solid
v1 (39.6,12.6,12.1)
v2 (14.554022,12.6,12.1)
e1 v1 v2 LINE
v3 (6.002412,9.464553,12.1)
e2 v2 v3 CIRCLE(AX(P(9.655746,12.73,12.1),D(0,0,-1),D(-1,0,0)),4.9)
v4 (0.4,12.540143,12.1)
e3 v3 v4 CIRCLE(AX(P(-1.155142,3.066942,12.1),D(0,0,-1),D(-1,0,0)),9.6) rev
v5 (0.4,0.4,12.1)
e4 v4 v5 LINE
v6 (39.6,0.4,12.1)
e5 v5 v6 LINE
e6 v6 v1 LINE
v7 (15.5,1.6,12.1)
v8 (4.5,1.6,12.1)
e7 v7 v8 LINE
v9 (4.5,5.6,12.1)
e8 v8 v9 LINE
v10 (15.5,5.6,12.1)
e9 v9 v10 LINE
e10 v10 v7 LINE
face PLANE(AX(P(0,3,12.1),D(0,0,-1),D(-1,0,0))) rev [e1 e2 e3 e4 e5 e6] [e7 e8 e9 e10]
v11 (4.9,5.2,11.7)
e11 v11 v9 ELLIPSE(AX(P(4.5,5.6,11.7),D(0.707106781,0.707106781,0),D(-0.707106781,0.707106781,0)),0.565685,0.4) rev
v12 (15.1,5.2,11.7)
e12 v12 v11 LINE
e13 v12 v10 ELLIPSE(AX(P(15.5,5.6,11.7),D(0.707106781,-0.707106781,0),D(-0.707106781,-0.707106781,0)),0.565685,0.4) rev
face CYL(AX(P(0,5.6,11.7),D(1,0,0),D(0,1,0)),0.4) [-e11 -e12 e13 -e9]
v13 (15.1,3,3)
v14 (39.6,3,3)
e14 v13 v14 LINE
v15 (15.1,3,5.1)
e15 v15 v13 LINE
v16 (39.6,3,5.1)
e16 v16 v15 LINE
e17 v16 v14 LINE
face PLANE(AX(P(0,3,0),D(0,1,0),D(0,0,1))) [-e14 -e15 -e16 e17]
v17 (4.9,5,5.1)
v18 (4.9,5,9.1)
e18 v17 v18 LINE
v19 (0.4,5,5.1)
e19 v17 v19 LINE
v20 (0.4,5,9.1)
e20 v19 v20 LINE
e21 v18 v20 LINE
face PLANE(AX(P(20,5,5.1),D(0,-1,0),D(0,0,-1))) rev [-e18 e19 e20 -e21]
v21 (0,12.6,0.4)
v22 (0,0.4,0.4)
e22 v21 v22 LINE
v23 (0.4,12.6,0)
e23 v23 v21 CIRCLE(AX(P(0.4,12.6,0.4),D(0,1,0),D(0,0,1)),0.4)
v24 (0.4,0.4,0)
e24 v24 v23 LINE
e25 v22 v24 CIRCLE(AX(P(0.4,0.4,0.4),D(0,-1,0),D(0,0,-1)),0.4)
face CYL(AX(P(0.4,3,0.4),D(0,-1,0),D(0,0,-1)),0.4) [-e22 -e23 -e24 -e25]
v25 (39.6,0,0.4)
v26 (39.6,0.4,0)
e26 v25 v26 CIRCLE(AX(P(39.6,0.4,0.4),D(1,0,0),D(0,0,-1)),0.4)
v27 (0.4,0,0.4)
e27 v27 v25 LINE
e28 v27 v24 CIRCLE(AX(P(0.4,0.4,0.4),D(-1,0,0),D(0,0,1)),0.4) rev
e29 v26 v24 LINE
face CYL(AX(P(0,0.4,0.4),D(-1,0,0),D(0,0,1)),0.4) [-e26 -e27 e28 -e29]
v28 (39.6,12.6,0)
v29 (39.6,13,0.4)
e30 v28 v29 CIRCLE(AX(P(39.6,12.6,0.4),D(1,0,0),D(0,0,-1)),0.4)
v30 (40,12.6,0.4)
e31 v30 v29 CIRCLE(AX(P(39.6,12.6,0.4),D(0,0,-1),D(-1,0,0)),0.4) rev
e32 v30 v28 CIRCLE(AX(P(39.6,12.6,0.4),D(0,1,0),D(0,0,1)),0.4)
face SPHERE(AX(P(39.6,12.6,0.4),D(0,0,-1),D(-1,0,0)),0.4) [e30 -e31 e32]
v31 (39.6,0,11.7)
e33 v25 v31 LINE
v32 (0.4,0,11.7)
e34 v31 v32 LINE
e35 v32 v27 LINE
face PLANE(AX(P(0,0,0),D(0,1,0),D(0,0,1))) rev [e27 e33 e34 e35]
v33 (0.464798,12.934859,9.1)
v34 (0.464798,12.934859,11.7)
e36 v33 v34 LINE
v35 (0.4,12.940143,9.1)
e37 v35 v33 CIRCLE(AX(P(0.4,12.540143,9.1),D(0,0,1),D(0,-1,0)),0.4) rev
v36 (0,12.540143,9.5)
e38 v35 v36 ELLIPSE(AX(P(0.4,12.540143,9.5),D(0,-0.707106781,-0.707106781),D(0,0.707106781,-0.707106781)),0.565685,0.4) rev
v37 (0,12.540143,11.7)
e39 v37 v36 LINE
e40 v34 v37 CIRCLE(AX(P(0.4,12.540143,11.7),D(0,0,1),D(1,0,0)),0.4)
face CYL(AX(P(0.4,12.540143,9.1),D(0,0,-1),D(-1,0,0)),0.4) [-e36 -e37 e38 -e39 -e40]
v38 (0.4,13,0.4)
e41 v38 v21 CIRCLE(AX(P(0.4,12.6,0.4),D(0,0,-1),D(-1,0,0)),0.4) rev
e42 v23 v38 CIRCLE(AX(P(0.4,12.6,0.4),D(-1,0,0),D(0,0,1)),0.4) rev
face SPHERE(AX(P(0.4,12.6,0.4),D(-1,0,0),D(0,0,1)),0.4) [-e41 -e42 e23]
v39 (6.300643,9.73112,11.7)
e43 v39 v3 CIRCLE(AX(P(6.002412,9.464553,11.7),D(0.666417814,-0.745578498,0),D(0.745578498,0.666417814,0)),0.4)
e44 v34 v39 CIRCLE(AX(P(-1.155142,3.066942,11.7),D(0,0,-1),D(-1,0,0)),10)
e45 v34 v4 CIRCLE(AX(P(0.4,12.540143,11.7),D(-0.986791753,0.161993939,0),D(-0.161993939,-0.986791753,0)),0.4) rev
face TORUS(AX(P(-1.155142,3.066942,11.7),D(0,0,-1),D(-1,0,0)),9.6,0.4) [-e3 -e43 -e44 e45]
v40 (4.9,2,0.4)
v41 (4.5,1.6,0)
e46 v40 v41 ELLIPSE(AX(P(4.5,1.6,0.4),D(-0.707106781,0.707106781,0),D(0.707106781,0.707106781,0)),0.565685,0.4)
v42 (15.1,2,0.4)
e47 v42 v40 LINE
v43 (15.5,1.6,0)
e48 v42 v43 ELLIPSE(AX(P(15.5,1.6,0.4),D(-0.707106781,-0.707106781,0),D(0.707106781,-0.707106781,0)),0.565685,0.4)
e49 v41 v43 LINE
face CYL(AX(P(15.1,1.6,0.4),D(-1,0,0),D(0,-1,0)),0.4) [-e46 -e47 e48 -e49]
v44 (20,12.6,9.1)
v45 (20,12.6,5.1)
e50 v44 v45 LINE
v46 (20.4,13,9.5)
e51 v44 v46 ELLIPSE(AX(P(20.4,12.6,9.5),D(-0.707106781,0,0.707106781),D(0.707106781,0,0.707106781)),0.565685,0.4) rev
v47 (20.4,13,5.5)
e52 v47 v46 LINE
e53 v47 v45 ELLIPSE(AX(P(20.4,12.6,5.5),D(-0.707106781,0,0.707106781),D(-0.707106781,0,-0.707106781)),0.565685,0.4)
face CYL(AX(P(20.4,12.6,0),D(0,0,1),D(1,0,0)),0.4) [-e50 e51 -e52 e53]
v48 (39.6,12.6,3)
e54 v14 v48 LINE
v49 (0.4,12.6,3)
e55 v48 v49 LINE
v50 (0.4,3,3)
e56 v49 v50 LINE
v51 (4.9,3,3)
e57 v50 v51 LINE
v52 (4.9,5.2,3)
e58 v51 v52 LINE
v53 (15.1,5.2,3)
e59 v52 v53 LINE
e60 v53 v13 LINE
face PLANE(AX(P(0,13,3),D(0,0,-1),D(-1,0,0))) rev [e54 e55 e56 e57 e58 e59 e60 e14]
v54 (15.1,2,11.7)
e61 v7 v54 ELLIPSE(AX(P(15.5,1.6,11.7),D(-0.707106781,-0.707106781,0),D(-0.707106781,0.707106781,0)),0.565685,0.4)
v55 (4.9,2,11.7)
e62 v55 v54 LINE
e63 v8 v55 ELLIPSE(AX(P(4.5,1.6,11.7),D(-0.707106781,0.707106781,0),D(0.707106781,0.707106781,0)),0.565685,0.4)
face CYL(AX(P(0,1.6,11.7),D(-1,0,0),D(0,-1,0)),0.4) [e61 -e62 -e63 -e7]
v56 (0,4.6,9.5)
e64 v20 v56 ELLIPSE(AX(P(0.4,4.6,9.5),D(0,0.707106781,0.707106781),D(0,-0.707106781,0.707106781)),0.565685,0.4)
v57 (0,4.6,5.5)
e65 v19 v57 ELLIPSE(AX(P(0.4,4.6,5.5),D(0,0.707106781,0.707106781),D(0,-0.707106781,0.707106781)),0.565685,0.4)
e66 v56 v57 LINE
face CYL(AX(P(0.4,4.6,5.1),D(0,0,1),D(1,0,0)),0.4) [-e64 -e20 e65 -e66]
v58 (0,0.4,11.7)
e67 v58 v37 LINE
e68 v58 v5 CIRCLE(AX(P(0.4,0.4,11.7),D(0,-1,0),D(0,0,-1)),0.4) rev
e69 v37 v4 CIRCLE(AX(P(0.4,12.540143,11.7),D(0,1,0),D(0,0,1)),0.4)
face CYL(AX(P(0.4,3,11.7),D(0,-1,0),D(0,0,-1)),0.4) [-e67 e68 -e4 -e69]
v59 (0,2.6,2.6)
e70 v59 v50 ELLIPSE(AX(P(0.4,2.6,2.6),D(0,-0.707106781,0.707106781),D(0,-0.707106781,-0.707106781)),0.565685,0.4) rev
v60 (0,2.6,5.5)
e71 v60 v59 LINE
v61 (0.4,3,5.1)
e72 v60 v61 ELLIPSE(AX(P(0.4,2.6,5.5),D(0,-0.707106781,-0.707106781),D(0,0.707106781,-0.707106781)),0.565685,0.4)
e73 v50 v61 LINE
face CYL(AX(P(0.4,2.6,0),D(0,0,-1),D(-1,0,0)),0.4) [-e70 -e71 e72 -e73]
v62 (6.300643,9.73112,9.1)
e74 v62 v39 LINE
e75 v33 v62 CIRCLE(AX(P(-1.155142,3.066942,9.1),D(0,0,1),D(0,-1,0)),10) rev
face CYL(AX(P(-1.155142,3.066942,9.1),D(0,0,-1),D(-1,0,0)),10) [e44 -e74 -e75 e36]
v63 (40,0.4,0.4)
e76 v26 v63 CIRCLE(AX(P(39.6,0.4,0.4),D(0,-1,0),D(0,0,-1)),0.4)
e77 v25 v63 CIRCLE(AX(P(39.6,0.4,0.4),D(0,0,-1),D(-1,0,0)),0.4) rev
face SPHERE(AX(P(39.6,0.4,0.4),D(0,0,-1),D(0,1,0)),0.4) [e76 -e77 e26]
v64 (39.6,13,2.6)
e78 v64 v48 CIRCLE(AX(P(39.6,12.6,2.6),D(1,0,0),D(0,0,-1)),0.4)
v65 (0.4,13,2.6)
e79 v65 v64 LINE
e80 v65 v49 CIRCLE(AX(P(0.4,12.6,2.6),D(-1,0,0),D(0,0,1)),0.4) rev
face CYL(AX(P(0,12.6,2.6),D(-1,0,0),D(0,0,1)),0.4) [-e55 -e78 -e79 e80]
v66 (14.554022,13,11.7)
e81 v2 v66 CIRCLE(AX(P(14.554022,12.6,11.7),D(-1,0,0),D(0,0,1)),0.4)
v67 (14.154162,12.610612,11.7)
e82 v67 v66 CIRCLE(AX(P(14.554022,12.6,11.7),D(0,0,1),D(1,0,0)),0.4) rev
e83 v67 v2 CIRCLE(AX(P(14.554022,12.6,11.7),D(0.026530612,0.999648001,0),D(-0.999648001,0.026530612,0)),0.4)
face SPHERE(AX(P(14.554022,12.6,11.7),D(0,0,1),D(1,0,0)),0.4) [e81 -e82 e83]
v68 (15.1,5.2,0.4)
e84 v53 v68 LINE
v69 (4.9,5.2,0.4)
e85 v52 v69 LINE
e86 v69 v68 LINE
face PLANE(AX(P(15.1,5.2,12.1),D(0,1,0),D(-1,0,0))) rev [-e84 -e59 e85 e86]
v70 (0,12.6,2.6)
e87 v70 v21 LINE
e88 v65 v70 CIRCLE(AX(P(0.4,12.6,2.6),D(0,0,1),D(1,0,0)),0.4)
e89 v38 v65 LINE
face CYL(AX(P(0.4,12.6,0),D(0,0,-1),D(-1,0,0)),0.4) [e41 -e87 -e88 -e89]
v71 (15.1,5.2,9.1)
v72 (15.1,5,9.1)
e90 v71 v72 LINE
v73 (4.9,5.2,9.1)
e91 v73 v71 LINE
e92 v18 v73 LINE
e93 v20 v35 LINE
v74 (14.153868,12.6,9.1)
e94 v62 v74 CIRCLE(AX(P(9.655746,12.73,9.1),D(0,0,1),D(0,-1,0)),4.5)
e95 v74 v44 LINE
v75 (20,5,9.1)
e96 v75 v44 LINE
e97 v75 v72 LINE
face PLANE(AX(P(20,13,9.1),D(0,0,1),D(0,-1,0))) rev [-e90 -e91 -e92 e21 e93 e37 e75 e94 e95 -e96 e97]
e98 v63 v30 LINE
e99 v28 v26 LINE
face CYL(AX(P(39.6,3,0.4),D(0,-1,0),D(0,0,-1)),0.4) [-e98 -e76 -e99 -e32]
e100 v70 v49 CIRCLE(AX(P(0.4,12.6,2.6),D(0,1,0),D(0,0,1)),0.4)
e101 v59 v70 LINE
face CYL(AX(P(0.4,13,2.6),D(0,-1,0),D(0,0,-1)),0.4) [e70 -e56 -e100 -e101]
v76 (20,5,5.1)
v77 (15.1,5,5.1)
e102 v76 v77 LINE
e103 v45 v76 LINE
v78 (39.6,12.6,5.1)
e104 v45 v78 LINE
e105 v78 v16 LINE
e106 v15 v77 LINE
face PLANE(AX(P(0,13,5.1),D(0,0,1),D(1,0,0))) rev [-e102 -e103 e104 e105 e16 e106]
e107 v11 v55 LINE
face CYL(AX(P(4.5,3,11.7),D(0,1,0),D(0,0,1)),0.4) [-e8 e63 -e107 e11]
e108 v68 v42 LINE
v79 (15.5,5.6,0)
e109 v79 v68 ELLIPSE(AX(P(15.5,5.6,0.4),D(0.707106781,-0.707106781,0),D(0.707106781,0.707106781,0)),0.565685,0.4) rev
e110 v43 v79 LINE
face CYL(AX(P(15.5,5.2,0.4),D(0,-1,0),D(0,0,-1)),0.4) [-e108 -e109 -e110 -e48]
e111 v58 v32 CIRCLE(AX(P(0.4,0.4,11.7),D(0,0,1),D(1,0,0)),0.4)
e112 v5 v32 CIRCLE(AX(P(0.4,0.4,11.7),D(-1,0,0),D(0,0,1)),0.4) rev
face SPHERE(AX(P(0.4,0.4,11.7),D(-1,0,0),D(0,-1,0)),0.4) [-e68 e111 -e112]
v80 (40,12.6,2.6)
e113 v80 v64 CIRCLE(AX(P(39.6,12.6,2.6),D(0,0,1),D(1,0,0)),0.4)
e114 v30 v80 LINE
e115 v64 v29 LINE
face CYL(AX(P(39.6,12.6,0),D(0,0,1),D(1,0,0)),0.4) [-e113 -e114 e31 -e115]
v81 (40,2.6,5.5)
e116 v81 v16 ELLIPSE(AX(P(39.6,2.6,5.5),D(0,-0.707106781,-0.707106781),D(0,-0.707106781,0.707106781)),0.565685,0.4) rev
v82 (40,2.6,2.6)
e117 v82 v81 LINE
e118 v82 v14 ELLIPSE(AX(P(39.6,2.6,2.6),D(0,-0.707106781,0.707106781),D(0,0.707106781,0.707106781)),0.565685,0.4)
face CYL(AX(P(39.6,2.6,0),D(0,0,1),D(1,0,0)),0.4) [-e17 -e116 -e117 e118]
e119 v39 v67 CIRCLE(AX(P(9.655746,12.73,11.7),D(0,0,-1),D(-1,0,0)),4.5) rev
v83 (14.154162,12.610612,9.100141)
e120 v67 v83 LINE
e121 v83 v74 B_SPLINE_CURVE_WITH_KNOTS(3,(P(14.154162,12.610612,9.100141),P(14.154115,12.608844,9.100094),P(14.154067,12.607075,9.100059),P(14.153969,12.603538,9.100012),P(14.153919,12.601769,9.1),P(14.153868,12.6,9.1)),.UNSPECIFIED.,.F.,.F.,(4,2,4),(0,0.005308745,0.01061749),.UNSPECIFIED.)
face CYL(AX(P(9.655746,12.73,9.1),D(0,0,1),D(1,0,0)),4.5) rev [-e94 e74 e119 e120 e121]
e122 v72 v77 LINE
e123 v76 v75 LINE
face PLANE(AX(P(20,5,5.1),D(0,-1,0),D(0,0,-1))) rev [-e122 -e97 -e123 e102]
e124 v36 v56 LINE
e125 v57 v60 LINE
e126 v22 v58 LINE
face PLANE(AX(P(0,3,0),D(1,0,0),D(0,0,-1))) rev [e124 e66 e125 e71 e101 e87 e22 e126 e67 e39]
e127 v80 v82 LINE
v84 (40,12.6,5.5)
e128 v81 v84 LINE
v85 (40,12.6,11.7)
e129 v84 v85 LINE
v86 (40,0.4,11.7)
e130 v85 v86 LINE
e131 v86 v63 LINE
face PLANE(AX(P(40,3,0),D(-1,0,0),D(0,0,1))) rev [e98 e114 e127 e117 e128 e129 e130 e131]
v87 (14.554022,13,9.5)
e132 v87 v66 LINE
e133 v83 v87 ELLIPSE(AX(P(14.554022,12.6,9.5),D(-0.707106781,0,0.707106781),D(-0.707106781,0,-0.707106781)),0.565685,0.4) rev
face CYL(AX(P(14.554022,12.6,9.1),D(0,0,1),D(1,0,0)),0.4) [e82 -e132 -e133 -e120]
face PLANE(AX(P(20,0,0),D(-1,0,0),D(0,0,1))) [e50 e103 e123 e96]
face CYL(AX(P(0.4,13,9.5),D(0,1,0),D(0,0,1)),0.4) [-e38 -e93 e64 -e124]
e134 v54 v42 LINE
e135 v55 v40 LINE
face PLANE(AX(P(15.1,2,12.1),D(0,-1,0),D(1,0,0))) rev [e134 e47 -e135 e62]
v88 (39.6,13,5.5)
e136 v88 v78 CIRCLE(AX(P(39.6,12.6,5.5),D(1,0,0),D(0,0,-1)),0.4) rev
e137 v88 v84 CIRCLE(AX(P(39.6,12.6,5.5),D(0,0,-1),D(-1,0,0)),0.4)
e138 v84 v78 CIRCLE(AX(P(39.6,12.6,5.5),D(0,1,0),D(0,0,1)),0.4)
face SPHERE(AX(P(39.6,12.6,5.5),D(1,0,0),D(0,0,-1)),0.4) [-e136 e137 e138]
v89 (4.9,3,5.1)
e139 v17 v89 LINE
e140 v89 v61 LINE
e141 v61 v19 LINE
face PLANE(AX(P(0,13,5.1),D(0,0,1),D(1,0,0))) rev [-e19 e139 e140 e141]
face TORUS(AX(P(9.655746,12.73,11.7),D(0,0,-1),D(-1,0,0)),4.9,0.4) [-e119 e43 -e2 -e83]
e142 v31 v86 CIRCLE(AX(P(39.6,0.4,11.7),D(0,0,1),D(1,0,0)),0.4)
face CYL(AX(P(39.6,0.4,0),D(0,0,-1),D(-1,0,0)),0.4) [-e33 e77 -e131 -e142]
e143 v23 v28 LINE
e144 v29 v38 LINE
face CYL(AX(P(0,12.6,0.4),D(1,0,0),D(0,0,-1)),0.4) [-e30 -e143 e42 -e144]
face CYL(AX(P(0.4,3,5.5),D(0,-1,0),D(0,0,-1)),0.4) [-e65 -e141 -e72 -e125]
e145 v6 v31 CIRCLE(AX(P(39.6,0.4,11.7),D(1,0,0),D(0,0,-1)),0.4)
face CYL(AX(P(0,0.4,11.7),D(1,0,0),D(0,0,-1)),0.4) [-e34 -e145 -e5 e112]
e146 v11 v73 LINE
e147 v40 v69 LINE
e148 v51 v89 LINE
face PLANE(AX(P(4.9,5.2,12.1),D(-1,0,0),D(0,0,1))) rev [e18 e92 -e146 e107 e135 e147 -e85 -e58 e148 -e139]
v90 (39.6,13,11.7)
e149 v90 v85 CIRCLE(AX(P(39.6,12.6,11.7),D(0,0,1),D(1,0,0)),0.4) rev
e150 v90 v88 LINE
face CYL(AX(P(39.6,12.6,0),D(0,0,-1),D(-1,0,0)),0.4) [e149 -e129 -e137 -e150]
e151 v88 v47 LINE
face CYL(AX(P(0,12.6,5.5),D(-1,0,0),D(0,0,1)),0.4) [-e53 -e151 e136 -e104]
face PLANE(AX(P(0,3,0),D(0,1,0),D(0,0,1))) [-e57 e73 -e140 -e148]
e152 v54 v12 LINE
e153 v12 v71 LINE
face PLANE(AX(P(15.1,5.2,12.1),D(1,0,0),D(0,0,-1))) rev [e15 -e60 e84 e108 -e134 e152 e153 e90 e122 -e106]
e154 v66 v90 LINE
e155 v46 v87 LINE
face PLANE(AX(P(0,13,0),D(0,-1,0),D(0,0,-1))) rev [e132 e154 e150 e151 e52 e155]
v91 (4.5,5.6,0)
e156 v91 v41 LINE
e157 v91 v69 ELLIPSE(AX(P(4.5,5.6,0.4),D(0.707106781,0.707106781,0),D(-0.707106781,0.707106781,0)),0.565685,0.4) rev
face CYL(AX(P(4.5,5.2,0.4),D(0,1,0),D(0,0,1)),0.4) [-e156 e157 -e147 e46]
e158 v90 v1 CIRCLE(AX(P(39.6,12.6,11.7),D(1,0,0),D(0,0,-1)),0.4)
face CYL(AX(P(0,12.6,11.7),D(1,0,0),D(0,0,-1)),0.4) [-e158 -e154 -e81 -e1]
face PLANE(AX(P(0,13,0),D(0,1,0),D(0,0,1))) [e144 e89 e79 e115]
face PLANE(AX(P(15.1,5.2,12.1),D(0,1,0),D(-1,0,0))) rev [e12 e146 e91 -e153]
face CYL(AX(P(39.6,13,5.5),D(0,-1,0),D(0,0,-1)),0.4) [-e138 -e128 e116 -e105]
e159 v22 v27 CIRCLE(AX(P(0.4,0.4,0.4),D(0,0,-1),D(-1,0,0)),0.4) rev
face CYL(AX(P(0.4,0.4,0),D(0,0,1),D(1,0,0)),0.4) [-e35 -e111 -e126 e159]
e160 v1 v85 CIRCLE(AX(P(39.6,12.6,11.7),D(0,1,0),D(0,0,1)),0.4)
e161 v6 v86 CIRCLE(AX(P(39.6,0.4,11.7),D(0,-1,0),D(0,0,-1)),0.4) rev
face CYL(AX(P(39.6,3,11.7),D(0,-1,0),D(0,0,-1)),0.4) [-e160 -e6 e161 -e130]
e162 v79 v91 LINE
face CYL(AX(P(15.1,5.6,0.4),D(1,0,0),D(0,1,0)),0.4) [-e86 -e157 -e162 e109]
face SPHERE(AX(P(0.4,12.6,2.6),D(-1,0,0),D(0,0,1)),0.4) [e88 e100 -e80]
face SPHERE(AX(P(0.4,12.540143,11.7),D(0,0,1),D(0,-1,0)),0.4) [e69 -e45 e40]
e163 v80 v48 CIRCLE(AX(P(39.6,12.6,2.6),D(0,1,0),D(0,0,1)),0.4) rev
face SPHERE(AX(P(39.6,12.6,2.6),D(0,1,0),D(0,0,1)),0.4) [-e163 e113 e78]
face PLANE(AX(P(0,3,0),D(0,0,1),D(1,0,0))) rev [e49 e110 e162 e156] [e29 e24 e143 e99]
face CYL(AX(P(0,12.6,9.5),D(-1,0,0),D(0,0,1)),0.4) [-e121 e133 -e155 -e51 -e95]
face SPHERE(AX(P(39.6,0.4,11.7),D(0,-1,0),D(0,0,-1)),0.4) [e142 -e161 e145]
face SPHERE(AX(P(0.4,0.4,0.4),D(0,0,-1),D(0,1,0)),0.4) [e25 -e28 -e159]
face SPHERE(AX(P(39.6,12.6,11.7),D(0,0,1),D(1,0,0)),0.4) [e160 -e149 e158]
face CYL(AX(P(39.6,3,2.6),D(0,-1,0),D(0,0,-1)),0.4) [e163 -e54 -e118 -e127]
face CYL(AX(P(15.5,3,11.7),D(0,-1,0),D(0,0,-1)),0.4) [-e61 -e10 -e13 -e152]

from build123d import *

# Parameters (mm, degrees)
SKETCH1_W           = 40
SKETCH1_H           = 12.1
BOSS_EXTRUDE1_DEPTH = 3
SKETCH2_W           = 40
SKETCH2_H           = 3
SKETCH2_H_2         = 7
BOSS_EXTRUDE2_DEPTH = 10
SKETCH3_W           = 10.2
SKETCH3_H           = 3.2
CUT_EXTRUDE1_DEPTH  = 44.765397291
SKETCH4_W           = 4
SKETCH4_H           = 8
CUT_EXTRUDE2_DEPTH  = 20
SKETCH5_R           = 4.5
CUT_EXTRUDE3_DEPTH  = 3
FILLET2_R           = 10
FILLET1_R           = 0.4


with BuildPart() as part:
    # Sketch1 → Boss-Extrude1 (new body)
    with BuildSketch(Plane(origin=(0, 0, 0), x_dir=(1, 0, 0), z_dir=(0, 1, 0))):
        with Locations((20, -6.05)):
            Rectangle(SKETCH1_W, SKETCH1_H)
    extrude(amount=BOSS_EXTRUDE1_DEPTH)

    # Sketch2 → Boss-Extrude2 (add)
    with BuildSketch(Plane(origin=(0, 3, 0), x_dir=(1, 0, 0), z_dir=(0, 1, 0))):
        with Locations((20, -1.5)):
            Rectangle(SKETCH2_W, SKETCH2_H)
        with Locations((20, -8.6)):
            Rectangle(SKETCH2_W, SKETCH2_H_2)
    extrude(amount=BOSS_EXTRUDE2_DEPTH)

    # Sketch3 → Cut-Extrude1 (cut, through all)
    with BuildSketch(Plane(origin=(0, 0, 0), x_dir=(-1, 0, 0), z_dir=(0, 0, -1))):
        with Locations((-10, 3.6)):
            Rectangle(SKETCH3_W, SKETCH3_H)
    extrude(amount=-CUT_EXTRUDE1_DEPTH, mode=Mode.SUBTRACT)

    # Sketch4 → Cut-Extrude2 (cut)
    with BuildSketch(Plane.ZY):
        with Locations((7.1, 9)):
            Rectangle(SKETCH4_W, SKETCH4_H)
    extrude(amount=-CUT_EXTRUDE2_DEPTH, mode=Mode.SUBTRACT)

    # Sketch5 → Cut-Extrude3 (cut)
    with BuildSketch(Plane.XY.offset(12.1)):
        with Locations((9.655746404, 12.73)):
            Circle(SKETCH5_R)
    extrude(amount=-CUT_EXTRUDE3_DEPTH, mode=Mode.SUBTRACT)

    # Fillet2
    # the kernel refuses this fillet: 10 mm, written as the material it takes off along each edge
    with BuildSketch(Plane(origin=(5.163853707, 13, 9.1), x_dir=(0.32846589208199206, -0.9445158324447405, 0), z_dir=(0, 0, 1))) as fillet2_piece_1:
        with BuildLine():
            CenterArc((7.306356337, -9.231062175), FILLET2_R, 112.615500581, 41.575528471)
            Line((-1.696149814, -4.877341583), (0, 0))
            ThreePointArc((0, 0), (1.730452817, -0.346022021), (3.460905633, 0))
        make_face()
    extrude(amount=15.909634267, mode=Mode.SUBTRACT)

    # Fillet1
    fillet1_edges = [part.edges().sort_by_distance(p)[0] for p in [
        (0, 3, 4.05),
        (0, 8, 3),
        (40, 8, 3),
        (0, 13, 1.5),
        (20, 13, 3),
        (40, 13, 1.5),
        (20, 13, 0),
        (40, 3, 4.05),
        (40, 8, 5.1),
        (40, 13, 8.6),
        (30, 13, 5.1),
        (15.1, 3.6, 12.1),
        (10, 5.2, 12.1),
        (4.9, 3.6, 12.1),
        (10, 2, 12.1),
        (15.1, 3.6, 0),
        (10, 2, 0),
        (4.9, 3.6, 0),
        (20, 0, 0),
        (10, 5.2, 0),
        (40, 0, 6.05),
        (20, 0, 12.1),
        (0, 0, 6.05),
        (0, 13, 10.6),
        (0, 4, 5.1),
        (17.07381955, 13, 9.1),
        (20, 13, 7.1),
        (0, 5, 7.1),
        (0, 9, 9.1),
        (0, 6.5, 0),
        (40, 6.5, 0),
        (40, 6.5, 12.1),
        (0, 6.5, 12.1),
        (27.07381955, 13, 12.1),
        (14.147639101, 13, 10.6),
        (11.38619922, 8.576022021, 12.1),
        (3.450117075, 11.943404417, 12.1),
    ]]
    fillet(fillet1_edges, radius=FILLET1_R)


solid = part.part
